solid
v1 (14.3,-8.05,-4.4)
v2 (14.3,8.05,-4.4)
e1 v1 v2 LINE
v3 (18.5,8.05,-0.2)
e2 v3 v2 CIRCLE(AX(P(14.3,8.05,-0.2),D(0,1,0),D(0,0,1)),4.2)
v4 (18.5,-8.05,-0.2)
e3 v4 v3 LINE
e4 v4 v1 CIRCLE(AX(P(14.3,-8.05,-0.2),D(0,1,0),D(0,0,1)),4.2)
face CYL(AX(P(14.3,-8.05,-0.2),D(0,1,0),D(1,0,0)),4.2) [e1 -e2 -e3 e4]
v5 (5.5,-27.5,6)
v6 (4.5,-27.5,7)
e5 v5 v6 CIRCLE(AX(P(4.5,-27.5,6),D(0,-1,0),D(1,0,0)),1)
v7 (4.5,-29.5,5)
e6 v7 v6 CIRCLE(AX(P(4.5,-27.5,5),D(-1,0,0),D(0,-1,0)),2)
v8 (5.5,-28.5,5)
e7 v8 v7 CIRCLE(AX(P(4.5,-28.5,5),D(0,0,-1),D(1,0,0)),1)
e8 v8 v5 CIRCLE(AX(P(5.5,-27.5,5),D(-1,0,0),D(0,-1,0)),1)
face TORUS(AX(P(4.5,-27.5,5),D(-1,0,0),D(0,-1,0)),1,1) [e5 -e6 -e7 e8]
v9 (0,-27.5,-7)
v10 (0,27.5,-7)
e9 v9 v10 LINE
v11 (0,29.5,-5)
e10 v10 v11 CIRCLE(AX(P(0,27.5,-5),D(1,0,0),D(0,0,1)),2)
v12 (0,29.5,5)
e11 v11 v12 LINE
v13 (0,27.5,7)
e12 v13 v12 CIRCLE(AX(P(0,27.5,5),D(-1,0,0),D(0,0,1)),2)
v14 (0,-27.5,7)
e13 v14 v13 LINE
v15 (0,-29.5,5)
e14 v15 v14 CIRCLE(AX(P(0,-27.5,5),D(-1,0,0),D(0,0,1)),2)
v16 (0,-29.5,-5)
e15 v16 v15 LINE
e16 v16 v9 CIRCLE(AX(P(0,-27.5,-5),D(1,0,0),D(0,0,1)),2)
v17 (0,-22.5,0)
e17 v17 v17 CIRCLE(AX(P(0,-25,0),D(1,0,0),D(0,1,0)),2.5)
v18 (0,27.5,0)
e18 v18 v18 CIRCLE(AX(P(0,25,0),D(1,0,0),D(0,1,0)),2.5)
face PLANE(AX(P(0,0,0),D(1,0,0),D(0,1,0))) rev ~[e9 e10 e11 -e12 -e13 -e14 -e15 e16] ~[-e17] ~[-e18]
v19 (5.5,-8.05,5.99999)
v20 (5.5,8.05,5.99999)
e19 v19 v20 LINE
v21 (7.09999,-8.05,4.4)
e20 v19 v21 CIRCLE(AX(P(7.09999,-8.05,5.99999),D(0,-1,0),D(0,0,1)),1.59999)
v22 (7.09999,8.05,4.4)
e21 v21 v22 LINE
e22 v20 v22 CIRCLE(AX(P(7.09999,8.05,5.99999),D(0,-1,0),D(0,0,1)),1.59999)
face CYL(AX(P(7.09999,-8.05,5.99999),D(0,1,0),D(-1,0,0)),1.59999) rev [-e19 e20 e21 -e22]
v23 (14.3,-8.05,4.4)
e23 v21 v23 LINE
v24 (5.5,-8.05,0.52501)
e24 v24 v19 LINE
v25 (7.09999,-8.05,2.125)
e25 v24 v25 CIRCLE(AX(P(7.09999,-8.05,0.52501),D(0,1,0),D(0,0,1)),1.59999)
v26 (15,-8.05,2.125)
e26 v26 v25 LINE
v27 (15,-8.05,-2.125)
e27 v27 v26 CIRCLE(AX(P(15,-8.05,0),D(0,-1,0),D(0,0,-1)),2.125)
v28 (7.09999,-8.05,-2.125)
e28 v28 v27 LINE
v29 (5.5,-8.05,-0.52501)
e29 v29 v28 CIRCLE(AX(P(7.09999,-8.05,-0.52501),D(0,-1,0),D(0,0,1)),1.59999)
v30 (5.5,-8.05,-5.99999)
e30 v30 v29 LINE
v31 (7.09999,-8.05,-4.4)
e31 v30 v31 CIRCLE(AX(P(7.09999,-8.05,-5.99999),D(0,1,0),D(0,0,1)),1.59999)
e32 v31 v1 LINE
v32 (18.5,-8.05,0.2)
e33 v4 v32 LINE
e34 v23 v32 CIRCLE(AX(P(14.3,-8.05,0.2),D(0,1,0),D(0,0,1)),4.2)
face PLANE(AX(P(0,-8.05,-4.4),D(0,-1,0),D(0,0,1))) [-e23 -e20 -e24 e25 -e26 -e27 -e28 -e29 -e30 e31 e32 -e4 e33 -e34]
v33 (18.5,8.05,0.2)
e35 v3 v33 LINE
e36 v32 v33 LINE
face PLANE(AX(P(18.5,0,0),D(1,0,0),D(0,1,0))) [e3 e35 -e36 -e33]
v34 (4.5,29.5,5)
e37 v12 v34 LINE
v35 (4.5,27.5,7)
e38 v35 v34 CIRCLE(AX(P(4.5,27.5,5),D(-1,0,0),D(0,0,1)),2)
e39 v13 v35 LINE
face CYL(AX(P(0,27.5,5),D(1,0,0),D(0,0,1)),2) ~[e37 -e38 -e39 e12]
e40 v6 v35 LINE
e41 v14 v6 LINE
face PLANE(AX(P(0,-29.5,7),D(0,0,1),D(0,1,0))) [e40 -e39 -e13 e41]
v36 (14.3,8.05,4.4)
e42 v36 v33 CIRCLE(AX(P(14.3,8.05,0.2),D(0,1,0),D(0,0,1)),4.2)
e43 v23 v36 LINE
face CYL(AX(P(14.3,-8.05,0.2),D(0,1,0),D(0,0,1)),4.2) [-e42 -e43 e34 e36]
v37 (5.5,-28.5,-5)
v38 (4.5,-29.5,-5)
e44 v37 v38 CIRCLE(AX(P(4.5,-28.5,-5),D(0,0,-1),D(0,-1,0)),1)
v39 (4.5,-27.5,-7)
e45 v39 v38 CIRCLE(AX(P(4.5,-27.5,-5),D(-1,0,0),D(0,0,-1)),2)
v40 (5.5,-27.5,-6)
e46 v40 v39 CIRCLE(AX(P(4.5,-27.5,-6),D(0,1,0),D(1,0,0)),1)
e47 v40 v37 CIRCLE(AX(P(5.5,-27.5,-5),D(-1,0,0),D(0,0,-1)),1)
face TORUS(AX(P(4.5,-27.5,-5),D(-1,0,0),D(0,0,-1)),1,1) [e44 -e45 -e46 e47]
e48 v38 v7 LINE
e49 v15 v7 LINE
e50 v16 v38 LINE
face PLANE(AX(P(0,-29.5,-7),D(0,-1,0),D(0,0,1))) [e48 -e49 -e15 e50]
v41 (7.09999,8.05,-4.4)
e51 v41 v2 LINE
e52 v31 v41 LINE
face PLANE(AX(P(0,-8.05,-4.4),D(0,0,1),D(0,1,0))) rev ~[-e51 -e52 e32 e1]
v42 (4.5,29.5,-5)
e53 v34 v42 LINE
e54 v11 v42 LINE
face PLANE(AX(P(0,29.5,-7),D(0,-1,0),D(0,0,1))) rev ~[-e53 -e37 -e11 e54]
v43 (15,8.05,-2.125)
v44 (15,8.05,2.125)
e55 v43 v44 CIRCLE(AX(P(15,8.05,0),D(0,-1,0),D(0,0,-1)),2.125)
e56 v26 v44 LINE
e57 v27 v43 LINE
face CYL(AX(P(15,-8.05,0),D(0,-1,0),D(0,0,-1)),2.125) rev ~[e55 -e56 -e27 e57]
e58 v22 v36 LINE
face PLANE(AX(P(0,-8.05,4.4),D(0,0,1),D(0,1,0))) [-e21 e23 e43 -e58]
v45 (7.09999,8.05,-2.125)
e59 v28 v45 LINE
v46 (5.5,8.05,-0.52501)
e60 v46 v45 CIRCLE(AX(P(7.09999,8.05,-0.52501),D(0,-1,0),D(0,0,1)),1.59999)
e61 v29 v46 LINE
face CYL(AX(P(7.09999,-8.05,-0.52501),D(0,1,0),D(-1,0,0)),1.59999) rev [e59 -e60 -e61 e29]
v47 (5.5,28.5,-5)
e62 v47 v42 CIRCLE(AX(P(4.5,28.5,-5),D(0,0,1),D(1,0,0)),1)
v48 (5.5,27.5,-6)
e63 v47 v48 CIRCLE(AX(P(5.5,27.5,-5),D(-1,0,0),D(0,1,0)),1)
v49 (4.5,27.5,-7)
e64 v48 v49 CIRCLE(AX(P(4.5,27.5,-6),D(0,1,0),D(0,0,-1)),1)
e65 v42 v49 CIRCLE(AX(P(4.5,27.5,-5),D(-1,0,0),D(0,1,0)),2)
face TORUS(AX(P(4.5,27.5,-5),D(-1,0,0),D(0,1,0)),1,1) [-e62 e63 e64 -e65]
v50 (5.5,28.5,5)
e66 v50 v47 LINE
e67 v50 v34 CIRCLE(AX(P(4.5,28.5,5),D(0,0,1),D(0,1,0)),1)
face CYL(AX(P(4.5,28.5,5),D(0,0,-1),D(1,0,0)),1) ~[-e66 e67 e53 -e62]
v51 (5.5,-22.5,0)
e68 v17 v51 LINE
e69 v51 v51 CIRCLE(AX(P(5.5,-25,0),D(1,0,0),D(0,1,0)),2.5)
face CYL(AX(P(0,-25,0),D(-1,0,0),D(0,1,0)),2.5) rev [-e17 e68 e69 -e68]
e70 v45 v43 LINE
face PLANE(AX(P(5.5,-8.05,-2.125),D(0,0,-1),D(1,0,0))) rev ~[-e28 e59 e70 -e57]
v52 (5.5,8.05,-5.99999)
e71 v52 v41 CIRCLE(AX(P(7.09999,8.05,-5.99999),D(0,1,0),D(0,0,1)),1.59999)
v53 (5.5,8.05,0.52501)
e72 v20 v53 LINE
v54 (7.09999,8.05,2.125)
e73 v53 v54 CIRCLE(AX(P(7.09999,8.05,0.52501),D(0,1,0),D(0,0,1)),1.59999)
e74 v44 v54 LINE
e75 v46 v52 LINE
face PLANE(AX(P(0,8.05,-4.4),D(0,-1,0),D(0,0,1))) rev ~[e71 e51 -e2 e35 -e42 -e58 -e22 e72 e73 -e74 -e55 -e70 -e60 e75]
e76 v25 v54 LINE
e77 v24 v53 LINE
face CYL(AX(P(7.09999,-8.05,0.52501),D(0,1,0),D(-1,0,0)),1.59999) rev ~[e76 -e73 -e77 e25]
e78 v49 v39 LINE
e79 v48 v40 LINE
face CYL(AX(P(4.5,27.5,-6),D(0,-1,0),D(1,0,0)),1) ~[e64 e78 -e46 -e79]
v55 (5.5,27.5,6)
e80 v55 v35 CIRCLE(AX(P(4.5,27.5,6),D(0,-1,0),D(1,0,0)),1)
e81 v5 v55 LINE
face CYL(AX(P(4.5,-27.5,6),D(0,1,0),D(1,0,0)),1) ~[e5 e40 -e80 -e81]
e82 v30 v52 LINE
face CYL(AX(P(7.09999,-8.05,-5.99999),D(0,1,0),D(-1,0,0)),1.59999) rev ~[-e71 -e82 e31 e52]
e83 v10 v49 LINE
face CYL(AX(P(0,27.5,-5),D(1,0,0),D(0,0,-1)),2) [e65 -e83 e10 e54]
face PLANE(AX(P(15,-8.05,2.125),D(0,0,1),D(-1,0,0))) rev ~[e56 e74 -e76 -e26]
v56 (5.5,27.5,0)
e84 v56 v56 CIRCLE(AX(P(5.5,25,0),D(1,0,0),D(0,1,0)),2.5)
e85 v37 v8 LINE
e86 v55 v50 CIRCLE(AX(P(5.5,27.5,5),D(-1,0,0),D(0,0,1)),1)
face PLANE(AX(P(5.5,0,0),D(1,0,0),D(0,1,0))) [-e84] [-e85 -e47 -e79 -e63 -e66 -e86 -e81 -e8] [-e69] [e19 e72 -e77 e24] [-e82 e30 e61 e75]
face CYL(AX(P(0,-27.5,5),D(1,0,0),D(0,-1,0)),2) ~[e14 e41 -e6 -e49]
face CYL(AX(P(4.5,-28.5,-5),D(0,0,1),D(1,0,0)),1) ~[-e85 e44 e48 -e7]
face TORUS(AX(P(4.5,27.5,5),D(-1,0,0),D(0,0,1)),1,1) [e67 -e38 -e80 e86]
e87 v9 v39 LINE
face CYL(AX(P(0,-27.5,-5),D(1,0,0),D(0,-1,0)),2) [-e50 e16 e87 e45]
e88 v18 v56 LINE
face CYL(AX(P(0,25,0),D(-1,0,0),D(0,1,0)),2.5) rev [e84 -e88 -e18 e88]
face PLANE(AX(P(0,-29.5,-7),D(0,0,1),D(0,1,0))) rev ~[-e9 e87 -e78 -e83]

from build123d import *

# Parameters (mm, degrees)
F0_W     = 59
F0_H     = 14
F0_R     = 2.5
F0_W_2   = 16.1
F0_H_2   = 8.8
F1_DEPTH = 5.5
F2_DEPTH = 18.5
F3_R     = 4.2
F4_R     = 2
F5_R     = 1
F7_DEPTH = 25
F8_R     = 1.59999


# Not quite as in the source:
# - a fillet or chamfer is up to 0.001 mm smaller than in the source, because OpenCascade refuses the exact size


with BuildPart() as f1:
    # F0 (on Right) → F1 (new body)
    with BuildSketch(Plane.YZ):
        Rectangle(F0_W, F0_H)
        with Locations((-25, 0)):
            Circle(F0_R, mode=Mode.SUBTRACT)
        Rectangle(F0_W_2, F0_H_2, mode=Mode.SUBTRACT)
        with Locations((25, 0)):
            Circle(F0_R, mode=Mode.SUBTRACT)
    extrude(amount=F1_DEPTH)

    # F0 (on Right) → F2 (join)
    with BuildSketch(Plane.YZ):
        Rectangle(F0_W_2, F0_H_2)
        Circle(F0_R, mode=Mode.SUBTRACT)
        Circle(F0_R)
    extrude(amount=F2_DEPTH)

    # F3
    f3_edges = [f1.edges().sort_by_distance(p)[0] for p in [
        (18.5, 0, 4.4),
        (18.5, 0, -4.4),
    ]]
    fillet(f3_edges, radius=F3_R)

    # F4
    f4_edges = [f1.edges().sort_by_distance(p)[0] for p in [
        (2.75, 29.5, 7),
        (2.75, 29.5, -7),
        (2.75, -29.5, 7),
        (2.75, -29.5, -7),
    ]]
    fillet(f4_edges, radius=F4_R)

    # F5
    f5_edges = [f1.edges().sort_by_distance(p)[0] for p in [
        (5.5, 0, 7),
    ]]
    fillet(f5_edges, radius=F5_R)

    # F6 (on face) → F7 (cut)
    with BuildSketch(Plane.XZ.offset(8.05)):
        with BuildLine():
            Line((5.5, 2.125), (5.5, -2.125))
            Line((5.5, -2.125), (15, -2.125))
            ThreePointArc((15, -2.125), (17.125, 0), (15, 2.125))
            Line((15, 2.125), (5.5, 2.125))
        make_face()
    extrude(amount=-F7_DEPTH, mode=Mode.SUBTRACT)

    # F8 (radius 1.6 in the source; OpenCascade refuses exactly that, so slightly less here)
    f8_edges = [f1.edges().sort_by_distance(p)[0] for p in [
        (5.5, 0, 4.4),
        (5.5, 0, -4.4),
        (5.5, 0, -2.125),
        (5.5, 0, 2.125),
    ]]
    fillet(f8_edges, radius=F8_R)


solid = f1.part
